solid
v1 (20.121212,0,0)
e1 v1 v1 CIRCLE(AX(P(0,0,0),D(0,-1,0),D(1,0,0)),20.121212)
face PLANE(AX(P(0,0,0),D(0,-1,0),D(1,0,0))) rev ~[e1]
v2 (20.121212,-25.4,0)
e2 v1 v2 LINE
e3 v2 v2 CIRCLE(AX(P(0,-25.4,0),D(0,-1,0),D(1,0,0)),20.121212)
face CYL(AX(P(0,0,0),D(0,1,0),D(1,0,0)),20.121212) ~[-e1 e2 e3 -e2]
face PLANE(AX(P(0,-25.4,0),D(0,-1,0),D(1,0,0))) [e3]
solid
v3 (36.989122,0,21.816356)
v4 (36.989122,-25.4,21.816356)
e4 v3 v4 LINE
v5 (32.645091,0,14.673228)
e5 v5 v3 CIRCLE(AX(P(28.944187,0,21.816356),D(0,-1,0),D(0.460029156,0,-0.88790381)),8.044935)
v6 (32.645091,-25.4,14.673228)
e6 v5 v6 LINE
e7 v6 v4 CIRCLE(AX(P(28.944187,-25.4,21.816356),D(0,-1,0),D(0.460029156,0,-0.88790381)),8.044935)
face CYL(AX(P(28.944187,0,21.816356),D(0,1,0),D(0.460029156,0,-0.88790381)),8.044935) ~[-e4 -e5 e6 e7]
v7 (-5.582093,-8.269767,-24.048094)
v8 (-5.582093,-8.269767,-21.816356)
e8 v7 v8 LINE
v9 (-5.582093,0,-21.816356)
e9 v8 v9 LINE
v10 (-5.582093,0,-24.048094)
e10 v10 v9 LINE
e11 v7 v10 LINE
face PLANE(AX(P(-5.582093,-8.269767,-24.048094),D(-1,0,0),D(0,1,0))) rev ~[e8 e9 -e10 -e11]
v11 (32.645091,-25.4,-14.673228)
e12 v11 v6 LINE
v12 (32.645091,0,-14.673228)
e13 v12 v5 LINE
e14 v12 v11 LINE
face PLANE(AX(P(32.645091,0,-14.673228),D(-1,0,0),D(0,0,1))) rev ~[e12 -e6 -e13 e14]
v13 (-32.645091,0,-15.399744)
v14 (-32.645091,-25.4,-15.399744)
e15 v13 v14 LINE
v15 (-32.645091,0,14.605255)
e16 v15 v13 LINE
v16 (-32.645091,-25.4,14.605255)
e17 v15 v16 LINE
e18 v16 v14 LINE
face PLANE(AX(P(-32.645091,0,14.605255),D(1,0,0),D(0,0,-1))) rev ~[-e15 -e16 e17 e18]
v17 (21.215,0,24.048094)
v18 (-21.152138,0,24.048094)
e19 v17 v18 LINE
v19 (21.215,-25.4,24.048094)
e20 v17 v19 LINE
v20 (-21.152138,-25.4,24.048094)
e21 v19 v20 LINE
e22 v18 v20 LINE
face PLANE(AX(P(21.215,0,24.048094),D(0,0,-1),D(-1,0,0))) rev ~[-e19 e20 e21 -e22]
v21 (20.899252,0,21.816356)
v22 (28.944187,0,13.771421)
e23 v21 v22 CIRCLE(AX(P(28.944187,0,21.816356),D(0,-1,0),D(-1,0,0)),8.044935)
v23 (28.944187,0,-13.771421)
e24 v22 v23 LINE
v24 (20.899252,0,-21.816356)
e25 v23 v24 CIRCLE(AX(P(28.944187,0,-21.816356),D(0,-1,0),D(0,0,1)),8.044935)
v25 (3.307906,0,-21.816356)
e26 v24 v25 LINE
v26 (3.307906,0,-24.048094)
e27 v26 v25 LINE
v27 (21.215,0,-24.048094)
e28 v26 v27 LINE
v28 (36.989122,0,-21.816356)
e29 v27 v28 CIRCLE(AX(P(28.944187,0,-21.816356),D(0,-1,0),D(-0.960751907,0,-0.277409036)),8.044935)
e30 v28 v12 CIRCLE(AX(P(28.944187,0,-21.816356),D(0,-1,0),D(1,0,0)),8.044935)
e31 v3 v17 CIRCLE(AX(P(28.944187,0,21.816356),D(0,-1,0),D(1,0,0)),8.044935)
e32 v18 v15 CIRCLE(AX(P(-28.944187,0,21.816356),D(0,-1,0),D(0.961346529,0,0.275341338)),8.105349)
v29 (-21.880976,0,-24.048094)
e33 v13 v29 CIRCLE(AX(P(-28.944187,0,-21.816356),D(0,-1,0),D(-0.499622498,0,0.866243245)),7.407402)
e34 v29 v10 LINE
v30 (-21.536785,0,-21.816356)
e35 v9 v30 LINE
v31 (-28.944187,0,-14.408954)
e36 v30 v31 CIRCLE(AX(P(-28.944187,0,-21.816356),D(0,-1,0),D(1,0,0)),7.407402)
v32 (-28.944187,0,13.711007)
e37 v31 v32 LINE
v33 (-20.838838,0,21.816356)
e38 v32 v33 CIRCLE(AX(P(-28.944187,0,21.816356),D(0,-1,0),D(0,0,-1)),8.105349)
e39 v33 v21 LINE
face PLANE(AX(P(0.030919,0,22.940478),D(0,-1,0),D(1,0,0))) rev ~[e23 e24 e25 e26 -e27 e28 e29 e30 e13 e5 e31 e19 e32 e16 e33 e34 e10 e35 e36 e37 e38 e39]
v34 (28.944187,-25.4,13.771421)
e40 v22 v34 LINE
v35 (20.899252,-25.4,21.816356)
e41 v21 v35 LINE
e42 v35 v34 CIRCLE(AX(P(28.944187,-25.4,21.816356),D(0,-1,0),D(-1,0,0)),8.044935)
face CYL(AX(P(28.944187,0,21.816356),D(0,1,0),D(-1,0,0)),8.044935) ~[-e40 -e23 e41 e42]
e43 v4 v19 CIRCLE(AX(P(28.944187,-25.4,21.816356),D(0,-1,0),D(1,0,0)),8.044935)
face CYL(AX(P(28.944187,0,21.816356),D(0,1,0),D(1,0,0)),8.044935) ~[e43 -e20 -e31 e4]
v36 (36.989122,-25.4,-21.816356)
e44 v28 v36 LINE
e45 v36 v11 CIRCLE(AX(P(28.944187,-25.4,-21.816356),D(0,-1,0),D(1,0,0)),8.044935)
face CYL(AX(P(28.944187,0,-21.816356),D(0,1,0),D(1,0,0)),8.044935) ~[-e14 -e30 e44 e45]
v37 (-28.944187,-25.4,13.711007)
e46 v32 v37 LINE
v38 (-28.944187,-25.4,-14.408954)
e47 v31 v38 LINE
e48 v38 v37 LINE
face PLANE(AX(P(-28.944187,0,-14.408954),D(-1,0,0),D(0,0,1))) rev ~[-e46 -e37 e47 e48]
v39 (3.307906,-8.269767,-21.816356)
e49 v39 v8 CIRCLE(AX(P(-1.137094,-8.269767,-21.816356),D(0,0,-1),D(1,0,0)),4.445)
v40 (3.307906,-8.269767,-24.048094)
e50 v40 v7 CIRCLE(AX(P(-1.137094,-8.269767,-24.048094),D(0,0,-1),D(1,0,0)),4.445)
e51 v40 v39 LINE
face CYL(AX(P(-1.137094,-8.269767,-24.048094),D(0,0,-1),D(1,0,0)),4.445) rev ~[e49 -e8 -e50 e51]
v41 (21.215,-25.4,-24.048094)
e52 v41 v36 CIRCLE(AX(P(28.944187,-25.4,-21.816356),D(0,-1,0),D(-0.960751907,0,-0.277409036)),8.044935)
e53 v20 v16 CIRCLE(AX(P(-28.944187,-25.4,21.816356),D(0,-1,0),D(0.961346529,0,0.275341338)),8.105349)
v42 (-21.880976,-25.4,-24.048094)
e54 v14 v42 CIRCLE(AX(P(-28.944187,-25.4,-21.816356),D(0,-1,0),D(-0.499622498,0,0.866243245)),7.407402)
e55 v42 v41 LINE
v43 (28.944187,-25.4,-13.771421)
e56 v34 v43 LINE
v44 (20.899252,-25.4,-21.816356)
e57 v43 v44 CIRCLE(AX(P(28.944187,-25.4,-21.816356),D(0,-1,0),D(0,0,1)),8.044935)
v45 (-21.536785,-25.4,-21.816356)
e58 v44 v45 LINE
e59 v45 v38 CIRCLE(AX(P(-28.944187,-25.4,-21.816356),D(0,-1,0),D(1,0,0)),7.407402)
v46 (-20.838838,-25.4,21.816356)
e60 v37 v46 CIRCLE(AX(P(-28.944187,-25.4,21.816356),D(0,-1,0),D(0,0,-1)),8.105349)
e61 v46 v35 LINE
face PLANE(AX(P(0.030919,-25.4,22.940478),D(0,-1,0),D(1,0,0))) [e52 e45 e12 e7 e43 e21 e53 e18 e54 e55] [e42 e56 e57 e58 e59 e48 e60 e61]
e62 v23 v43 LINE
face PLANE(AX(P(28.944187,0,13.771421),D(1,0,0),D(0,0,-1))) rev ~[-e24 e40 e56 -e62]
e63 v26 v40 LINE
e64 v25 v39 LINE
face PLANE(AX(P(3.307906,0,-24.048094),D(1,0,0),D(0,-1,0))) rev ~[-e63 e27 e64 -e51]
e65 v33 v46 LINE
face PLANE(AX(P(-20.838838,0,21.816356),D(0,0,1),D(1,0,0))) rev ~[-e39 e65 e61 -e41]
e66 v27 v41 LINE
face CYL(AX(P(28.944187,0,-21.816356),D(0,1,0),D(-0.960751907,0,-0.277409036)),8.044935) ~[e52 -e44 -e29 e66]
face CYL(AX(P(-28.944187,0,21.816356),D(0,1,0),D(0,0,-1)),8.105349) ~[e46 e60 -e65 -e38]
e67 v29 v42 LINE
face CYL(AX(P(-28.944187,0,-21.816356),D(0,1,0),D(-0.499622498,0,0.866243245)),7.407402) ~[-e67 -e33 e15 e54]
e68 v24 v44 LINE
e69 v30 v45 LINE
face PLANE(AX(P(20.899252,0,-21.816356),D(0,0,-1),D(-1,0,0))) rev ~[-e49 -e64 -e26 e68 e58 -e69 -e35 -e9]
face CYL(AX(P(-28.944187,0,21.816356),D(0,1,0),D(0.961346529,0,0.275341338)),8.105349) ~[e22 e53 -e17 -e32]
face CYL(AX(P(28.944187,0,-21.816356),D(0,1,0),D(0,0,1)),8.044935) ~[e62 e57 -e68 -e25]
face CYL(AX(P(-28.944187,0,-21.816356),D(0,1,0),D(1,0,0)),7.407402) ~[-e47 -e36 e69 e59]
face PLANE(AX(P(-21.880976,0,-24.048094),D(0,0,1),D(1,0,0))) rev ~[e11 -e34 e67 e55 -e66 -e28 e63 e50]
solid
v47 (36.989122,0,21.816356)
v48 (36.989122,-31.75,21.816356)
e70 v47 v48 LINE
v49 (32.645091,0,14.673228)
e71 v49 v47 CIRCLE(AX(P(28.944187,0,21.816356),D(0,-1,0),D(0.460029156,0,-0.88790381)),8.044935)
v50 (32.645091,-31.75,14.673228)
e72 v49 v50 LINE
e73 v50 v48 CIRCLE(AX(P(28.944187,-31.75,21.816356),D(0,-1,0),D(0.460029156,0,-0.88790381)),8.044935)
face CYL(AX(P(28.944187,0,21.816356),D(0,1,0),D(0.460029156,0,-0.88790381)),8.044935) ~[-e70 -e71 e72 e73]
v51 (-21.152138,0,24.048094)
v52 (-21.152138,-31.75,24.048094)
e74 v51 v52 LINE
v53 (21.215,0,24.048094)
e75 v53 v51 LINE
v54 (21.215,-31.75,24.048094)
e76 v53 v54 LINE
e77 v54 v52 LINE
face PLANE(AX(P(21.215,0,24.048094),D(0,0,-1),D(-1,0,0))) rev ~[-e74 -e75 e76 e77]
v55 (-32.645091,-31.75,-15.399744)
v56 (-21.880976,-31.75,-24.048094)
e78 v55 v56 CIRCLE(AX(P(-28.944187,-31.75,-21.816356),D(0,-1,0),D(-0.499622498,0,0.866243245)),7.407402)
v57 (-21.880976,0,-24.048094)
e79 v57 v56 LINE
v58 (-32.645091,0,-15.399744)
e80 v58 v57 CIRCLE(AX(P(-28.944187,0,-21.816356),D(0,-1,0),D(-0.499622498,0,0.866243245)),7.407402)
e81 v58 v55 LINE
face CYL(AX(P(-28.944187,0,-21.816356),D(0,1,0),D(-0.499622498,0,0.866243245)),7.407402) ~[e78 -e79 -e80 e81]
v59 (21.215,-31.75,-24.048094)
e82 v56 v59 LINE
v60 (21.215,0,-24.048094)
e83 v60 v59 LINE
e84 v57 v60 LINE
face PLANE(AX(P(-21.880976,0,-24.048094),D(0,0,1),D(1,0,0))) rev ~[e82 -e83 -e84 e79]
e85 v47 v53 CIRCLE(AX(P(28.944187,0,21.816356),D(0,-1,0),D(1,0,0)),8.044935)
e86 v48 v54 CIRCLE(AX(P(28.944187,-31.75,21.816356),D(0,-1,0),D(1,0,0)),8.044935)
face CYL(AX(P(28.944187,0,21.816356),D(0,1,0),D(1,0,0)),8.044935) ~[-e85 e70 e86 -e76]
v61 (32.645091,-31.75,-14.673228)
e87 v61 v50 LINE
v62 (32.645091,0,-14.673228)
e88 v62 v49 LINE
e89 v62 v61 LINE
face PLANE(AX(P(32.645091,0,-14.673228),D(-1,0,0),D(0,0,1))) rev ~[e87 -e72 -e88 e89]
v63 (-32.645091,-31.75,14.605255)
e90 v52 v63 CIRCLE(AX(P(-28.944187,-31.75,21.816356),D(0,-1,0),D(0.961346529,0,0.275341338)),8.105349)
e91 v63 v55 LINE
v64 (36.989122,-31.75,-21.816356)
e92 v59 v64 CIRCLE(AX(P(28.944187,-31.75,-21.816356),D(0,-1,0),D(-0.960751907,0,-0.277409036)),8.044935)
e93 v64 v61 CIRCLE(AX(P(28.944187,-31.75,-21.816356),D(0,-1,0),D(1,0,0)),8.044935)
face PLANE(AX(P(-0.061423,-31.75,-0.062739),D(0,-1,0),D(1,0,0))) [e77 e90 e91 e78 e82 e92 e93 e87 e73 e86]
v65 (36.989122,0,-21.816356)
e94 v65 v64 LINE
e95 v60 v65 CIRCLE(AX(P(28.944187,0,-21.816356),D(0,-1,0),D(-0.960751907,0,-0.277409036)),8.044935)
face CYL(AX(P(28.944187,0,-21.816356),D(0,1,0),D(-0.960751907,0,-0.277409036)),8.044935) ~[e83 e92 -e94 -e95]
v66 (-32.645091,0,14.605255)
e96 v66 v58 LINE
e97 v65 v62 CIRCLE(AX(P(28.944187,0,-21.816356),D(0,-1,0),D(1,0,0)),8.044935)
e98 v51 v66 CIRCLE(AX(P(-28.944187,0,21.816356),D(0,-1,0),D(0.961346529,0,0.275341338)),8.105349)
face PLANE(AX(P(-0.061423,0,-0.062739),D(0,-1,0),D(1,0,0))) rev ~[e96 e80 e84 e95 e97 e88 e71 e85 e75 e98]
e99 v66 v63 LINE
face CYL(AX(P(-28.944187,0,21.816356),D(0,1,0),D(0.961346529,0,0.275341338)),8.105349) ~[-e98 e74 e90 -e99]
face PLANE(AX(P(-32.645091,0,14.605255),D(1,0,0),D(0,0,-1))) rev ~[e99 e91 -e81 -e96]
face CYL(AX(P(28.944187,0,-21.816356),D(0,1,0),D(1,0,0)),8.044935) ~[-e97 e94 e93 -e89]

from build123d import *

# Parameters (mm, degrees)
F0_R     = 20.1212122489
F1_DEPTH = 31.75
F2_DEPTH = 25.4
F4_DEPTH = 25.4


with BuildPart() as f1:
    # F0 (on Front) → F1 (new body)
    with BuildSketch(Plane.XZ):
        with BuildLine():
            ThreePointArc((28.9441868663, 13.7714213436), (23.2555589405, 16.1277281818), (20.8992521023, 21.8163561076))
            Line((20.8992521023, 21.8163561076), (-20.8388379964, 21.8163561076))
            ThreePointArc((-20.8388379964, 21.8163561076), (-23.2128397165, 16.0850089578), (-28.9441868663, 13.7110072377))
            Line((-28.9441868663, 13.7110072377), (-28.9441868663, -14.408954399))
            ThreePointArc((-28.9441868663, -14.408954399), (-23.7063628872, -16.5785321285), (-21.5367851577, -21.8163561076))
            Line((-21.5367851577, -21.8163561076), (20.8992521023, -21.8163561076))
            ThreePointArc((20.8992521023, -21.8163561076), (23.2555589405, -16.1277281818), (28.9441868663, -13.7714213436))
            Line((28.9441868663, -13.7714213436), (28.9441868663, 13.7714213436))
        make_face()
        Circle(F0_R, mode=Mode.SUBTRACT)
        Circle(F0_R)
        with BuildLine():
            ThreePointArc((-28.9441868663, 13.7110072377), (-23.2128397165, 16.0850089578), (-20.8388379964, 21.8163561076))
            ThreePointArc((-20.8388379964, 21.8163561076), (-20.9175451076, 22.9431668192), (-21.1521378679, 24.0480937064))
            ThreePointArc((-21.1521378679, 24.0480937064), (-34.0896867071, 28.0789842852), (-32.6450914145, 14.6052545393))
            ThreePointArc((-32.6450914145, 14.6052545393), (-30.8478919847, 13.9377402949), (-28.9441868663, 13.7110072377))
        make_face()
        with BuildLine():
            ThreePointArc((21.2150004507, 24.0480937064), (20.9785803028, 22.9433376657), (20.8992521023, 21.8163561076))
            ThreePointArc((20.8992521023, 21.8163561076), (23.2555589405, 16.1277281818), (28.9441868663, 13.7714213436))
            ThreePointArc((28.9441868663, 13.7714213436), (30.8487832476, 14.0001237684), (32.6450914145, 14.6732278796))
            ThreePointArc((32.6450914145, 14.6732278796), (35.8178507733, 17.6361982339), (36.9891216302, 21.8163561076))
            ThreePointArc((36.9891216302, 21.8163561076), (30.0711684244, 29.7819626711), (21.2150004507, 24.0480937064))
        make_face()
        with BuildLine():
            ThreePointArc((32.6450914145, -14.6732278796), (30.8487832476, -14.0001237684), (28.9441868663, -13.7714213436))
            ThreePointArc((28.9441868663, -13.7714213436), (23.2555589405, -16.1277281818), (20.8992521023, -21.8163561076))
            ThreePointArc((20.8992521023, -21.8163561076), (20.9785803028, -22.9433376657), (21.2150004507, -24.0480937064))
            ThreePointArc((21.2150004507, -24.0480937064), (30.0711684244, -29.7819626711), (36.9891216302, -21.8163561076))
            ThreePointArc((36.9891216302, -21.8163561076), (35.8178507733, -17.6361982339), (32.6450914145, -14.6732278796))
        make_face()
        with BuildLine():
            ThreePointArc((-21.5367851577, -21.8163561076), (-23.7063628872, -16.5785321285), (-28.9441868663, -14.408954399))
            ThreePointArc((-28.9441868663, -14.408954399), (-30.8598042167, -14.6609378641), (-32.6450914145, -15.3997444162))
            ThreePointArc((-32.6450914145, -15.3997444162), (-33.5836655288, -27.5908550306), (-21.8809760268, -24.0480937064))
            ThreePointArc((-21.8809760268, -24.0480937064), (-21.6233385509, -22.9454176719), (-21.5367851577, -21.8163561076))
        make_face()
        with BuildLine():
            Line((-28.9441868663, -14.408954399), (-28.9441868663, 13.7110072377))
            ThreePointArc((-28.9441868663, 13.7110072377), (-30.8478919847, 13.9377402949), (-32.6450914145, 14.6052545393))
            Line((-32.6450914145, 14.6052545393), (-32.6450914145, -15.3997444162))
            ThreePointArc((-32.6450914145, -15.3997444162), (-30.8598042167, -14.6609378641), (-28.9441868663, -14.408954399))
        make_face()
        with BuildLine():
            ThreePointArc((32.6450914145, 14.6732278796), (30.8487832476, 14.0001237684), (28.9441868663, 13.7714213436))
            Line((28.9441868663, 13.7714213436), (28.9441868663, -13.7714213436))
            ThreePointArc((28.9441868663, -13.7714213436), (30.8487832476, -14.0001237684), (32.6450914145, -14.6732278796))
            Line((32.6450914145, -14.6732278796), (32.6450914145, 14.6732278796))
        make_face()
        with BuildLine():
            ThreePointArc((21.2150004507, -24.0480937064), (20.9785803028, -22.9433376657), (20.8992521023, -21.8163561076))
            Line((20.8992521023, -21.8163561076), (-21.5367851577, -21.8163561076))
            ThreePointArc((-21.5367851577, -21.8163561076), (-21.6233385509, -22.9454176719), (-21.8809760268, -24.0480937064))
            Line((-21.8809760268, -24.0480937064), (21.2150004507, -24.0480937064))
        make_face()
        with BuildLine():
            Line((-20.8388379964, 21.8163561076), (20.8992521023, 21.8163561076))
            ThreePointArc((20.8992521023, 21.8163561076), (20.9785803028, 22.9433376657), (21.2150004507, 24.0480937064))
            Line((21.2150004507, 24.0480937064), (-21.1521378679, 24.0480937064))
            ThreePointArc((-21.1521378679, 24.0480937064), (-20.9175451076, 22.9431668192), (-20.8388379964, 21.8163561076))
        make_face()
    extrude(amount=F1_DEPTH)


with BuildPart() as f2:
    # F0 (on Front) → F2 (new body)
    with BuildSketch(Plane.XZ):
        with BuildLine():
            Line((-20.8388379964, 21.8163561076), (20.8992521023, 21.8163561076))
            ThreePointArc((20.8992521023, 21.8163561076), (20.9785803028, 22.9433376657), (21.2150004507, 24.0480937064))
            Line((21.2150004507, 24.0480937064), (-21.1521378679, 24.0480937064))
            ThreePointArc((-21.1521378679, 24.0480937064), (-20.9175451076, 22.9431668192), (-20.8388379964, 21.8163561076))
        make_face()
        with BuildLine():
            ThreePointArc((21.2150004507, 24.0480937064), (20.9785803028, 22.9433376657), (20.8992521023, 21.8163561076))
            ThreePointArc((20.8992521023, 21.8163561076), (23.2555589405, 16.1277281818), (28.9441868663, 13.7714213436))
            ThreePointArc((28.9441868663, 13.7714213436), (30.8487832476, 14.0001237684), (32.6450914145, 14.6732278796))
            ThreePointArc((32.6450914145, 14.6732278796), (35.8178507733, 17.6361982339), (36.9891216302, 21.8163561076))
            ThreePointArc((36.9891216302, 21.8163561076), (30.0711684244, 29.7819626711), (21.2150004507, 24.0480937064))
        make_face()
        with BuildLine():
            ThreePointArc((-28.9441868663, 13.7110072377), (-23.2128397165, 16.0850089578), (-20.8388379964, 21.8163561076))
            ThreePointArc((-20.8388379964, 21.8163561076), (-20.9175451076, 22.9431668192), (-21.1521378679, 24.0480937064))
            ThreePointArc((-21.1521378679, 24.0480937064), (-34.0896867071, 28.0789842852), (-32.6450914145, 14.6052545393))
            ThreePointArc((-32.6450914145, 14.6052545393), (-30.8478919847, 13.9377402949), (-28.9441868663, 13.7110072377))
        make_face()
        with BuildLine():
            ThreePointArc((32.6450914145, 14.6732278796), (30.8487832476, 14.0001237684), (28.9441868663, 13.7714213436))
            Line((28.9441868663, 13.7714213436), (28.9441868663, -13.7714213436))
            ThreePointArc((28.9441868663, -13.7714213436), (30.8487832476, -14.0001237684), (32.6450914145, -14.6732278796))
            Line((32.6450914145, -14.6732278796), (32.6450914145, 14.6732278796))
        make_face()
        with BuildLine():
            Line((-28.9441868663, -14.408954399), (-28.9441868663, 13.7110072377))
            ThreePointArc((-28.9441868663, 13.7110072377), (-30.8478919847, 13.9377402949), (-32.6450914145, 14.6052545393))
            Line((-32.6450914145, 14.6052545393), (-32.6450914145, -15.3997444162))
            ThreePointArc((-32.6450914145, -15.3997444162), (-30.8598042167, -14.6609378641), (-28.9441868663, -14.408954399))
        make_face()
        with BuildLine():
            ThreePointArc((32.6450914145, -14.6732278796), (30.8487832476, -14.0001237684), (28.9441868663, -13.7714213436))
            ThreePointArc((28.9441868663, -13.7714213436), (23.2555589405, -16.1277281818), (20.8992521023, -21.8163561076))
            ThreePointArc((20.8992521023, -21.8163561076), (20.9785803028, -22.9433376657), (21.2150004507, -24.0480937064))
            ThreePointArc((21.2150004507, -24.0480937064), (30.0711684244, -29.7819626711), (36.9891216302, -21.8163561076))
            ThreePointArc((36.9891216302, -21.8163561076), (35.8178507733, -17.6361982339), (32.6450914145, -14.6732278796))
        make_face()
        with BuildLine():
            ThreePointArc((-21.5367851577, -21.8163561076), (-23.7063628872, -16.5785321285), (-28.9441868663, -14.408954399))
            ThreePointArc((-28.9441868663, -14.408954399), (-30.8598042167, -14.6609378641), (-32.6450914145, -15.3997444162))
            ThreePointArc((-32.6450914145, -15.3997444162), (-33.5836655288, -27.5908550306), (-21.8809760268, -24.0480937064))
            ThreePointArc((-21.8809760268, -24.0480937064), (-21.6233385509, -22.9454176719), (-21.5367851577, -21.8163561076))
        make_face()
        with BuildLine():
            ThreePointArc((21.2150004507, -24.0480937064), (20.9785803028, -22.9433376657), (20.8992521023, -21.8163561076))
            Line((20.8992521023, -21.8163561076), (-21.5367851577, -21.8163561076))
            ThreePointArc((-21.5367851577, -21.8163561076), (-21.6233385509, -22.9454176719), (-21.8809760268, -24.0480937064))
            Line((-21.8809760268, -24.0480937064), (21.2150004507, -24.0480937064))
        make_face()
    extrude(amount=F2_DEPTH)

    # F3 (on face) → F4 (cut)
    with BuildSketch(Plane(origin=(0, 0, -24.0480937064), x_dir=(1, 0, 0), z_dir=(0, 0, -1))):
        with BuildLine():
            Line((-5.5820932612, 8.2697672769), (-5.5820932612, 0))
            Line((-5.5820932612, 0), (3.3079062123, 0))
            Line((3.3079062123, 0), (3.3079062123, 8.2697672769))
            ThreePointArc((3.3079062123, 8.2697672769), (-1.1370935244, 12.7147670137), (-5.5820932612, 8.2697672769))
        make_face()
    extrude(amount=-F4_DEPTH, mode=Mode.SUBTRACT)


with BuildPart() as f2b:
    # F0 (on Front) → F2, piece 2 (new body)
    with BuildSketch(Plane.XZ):
        Circle(F0_R)
    extrude(amount=F2_DEPTH)


solid = Compound([f1.part, f2.part, f2b.part])
